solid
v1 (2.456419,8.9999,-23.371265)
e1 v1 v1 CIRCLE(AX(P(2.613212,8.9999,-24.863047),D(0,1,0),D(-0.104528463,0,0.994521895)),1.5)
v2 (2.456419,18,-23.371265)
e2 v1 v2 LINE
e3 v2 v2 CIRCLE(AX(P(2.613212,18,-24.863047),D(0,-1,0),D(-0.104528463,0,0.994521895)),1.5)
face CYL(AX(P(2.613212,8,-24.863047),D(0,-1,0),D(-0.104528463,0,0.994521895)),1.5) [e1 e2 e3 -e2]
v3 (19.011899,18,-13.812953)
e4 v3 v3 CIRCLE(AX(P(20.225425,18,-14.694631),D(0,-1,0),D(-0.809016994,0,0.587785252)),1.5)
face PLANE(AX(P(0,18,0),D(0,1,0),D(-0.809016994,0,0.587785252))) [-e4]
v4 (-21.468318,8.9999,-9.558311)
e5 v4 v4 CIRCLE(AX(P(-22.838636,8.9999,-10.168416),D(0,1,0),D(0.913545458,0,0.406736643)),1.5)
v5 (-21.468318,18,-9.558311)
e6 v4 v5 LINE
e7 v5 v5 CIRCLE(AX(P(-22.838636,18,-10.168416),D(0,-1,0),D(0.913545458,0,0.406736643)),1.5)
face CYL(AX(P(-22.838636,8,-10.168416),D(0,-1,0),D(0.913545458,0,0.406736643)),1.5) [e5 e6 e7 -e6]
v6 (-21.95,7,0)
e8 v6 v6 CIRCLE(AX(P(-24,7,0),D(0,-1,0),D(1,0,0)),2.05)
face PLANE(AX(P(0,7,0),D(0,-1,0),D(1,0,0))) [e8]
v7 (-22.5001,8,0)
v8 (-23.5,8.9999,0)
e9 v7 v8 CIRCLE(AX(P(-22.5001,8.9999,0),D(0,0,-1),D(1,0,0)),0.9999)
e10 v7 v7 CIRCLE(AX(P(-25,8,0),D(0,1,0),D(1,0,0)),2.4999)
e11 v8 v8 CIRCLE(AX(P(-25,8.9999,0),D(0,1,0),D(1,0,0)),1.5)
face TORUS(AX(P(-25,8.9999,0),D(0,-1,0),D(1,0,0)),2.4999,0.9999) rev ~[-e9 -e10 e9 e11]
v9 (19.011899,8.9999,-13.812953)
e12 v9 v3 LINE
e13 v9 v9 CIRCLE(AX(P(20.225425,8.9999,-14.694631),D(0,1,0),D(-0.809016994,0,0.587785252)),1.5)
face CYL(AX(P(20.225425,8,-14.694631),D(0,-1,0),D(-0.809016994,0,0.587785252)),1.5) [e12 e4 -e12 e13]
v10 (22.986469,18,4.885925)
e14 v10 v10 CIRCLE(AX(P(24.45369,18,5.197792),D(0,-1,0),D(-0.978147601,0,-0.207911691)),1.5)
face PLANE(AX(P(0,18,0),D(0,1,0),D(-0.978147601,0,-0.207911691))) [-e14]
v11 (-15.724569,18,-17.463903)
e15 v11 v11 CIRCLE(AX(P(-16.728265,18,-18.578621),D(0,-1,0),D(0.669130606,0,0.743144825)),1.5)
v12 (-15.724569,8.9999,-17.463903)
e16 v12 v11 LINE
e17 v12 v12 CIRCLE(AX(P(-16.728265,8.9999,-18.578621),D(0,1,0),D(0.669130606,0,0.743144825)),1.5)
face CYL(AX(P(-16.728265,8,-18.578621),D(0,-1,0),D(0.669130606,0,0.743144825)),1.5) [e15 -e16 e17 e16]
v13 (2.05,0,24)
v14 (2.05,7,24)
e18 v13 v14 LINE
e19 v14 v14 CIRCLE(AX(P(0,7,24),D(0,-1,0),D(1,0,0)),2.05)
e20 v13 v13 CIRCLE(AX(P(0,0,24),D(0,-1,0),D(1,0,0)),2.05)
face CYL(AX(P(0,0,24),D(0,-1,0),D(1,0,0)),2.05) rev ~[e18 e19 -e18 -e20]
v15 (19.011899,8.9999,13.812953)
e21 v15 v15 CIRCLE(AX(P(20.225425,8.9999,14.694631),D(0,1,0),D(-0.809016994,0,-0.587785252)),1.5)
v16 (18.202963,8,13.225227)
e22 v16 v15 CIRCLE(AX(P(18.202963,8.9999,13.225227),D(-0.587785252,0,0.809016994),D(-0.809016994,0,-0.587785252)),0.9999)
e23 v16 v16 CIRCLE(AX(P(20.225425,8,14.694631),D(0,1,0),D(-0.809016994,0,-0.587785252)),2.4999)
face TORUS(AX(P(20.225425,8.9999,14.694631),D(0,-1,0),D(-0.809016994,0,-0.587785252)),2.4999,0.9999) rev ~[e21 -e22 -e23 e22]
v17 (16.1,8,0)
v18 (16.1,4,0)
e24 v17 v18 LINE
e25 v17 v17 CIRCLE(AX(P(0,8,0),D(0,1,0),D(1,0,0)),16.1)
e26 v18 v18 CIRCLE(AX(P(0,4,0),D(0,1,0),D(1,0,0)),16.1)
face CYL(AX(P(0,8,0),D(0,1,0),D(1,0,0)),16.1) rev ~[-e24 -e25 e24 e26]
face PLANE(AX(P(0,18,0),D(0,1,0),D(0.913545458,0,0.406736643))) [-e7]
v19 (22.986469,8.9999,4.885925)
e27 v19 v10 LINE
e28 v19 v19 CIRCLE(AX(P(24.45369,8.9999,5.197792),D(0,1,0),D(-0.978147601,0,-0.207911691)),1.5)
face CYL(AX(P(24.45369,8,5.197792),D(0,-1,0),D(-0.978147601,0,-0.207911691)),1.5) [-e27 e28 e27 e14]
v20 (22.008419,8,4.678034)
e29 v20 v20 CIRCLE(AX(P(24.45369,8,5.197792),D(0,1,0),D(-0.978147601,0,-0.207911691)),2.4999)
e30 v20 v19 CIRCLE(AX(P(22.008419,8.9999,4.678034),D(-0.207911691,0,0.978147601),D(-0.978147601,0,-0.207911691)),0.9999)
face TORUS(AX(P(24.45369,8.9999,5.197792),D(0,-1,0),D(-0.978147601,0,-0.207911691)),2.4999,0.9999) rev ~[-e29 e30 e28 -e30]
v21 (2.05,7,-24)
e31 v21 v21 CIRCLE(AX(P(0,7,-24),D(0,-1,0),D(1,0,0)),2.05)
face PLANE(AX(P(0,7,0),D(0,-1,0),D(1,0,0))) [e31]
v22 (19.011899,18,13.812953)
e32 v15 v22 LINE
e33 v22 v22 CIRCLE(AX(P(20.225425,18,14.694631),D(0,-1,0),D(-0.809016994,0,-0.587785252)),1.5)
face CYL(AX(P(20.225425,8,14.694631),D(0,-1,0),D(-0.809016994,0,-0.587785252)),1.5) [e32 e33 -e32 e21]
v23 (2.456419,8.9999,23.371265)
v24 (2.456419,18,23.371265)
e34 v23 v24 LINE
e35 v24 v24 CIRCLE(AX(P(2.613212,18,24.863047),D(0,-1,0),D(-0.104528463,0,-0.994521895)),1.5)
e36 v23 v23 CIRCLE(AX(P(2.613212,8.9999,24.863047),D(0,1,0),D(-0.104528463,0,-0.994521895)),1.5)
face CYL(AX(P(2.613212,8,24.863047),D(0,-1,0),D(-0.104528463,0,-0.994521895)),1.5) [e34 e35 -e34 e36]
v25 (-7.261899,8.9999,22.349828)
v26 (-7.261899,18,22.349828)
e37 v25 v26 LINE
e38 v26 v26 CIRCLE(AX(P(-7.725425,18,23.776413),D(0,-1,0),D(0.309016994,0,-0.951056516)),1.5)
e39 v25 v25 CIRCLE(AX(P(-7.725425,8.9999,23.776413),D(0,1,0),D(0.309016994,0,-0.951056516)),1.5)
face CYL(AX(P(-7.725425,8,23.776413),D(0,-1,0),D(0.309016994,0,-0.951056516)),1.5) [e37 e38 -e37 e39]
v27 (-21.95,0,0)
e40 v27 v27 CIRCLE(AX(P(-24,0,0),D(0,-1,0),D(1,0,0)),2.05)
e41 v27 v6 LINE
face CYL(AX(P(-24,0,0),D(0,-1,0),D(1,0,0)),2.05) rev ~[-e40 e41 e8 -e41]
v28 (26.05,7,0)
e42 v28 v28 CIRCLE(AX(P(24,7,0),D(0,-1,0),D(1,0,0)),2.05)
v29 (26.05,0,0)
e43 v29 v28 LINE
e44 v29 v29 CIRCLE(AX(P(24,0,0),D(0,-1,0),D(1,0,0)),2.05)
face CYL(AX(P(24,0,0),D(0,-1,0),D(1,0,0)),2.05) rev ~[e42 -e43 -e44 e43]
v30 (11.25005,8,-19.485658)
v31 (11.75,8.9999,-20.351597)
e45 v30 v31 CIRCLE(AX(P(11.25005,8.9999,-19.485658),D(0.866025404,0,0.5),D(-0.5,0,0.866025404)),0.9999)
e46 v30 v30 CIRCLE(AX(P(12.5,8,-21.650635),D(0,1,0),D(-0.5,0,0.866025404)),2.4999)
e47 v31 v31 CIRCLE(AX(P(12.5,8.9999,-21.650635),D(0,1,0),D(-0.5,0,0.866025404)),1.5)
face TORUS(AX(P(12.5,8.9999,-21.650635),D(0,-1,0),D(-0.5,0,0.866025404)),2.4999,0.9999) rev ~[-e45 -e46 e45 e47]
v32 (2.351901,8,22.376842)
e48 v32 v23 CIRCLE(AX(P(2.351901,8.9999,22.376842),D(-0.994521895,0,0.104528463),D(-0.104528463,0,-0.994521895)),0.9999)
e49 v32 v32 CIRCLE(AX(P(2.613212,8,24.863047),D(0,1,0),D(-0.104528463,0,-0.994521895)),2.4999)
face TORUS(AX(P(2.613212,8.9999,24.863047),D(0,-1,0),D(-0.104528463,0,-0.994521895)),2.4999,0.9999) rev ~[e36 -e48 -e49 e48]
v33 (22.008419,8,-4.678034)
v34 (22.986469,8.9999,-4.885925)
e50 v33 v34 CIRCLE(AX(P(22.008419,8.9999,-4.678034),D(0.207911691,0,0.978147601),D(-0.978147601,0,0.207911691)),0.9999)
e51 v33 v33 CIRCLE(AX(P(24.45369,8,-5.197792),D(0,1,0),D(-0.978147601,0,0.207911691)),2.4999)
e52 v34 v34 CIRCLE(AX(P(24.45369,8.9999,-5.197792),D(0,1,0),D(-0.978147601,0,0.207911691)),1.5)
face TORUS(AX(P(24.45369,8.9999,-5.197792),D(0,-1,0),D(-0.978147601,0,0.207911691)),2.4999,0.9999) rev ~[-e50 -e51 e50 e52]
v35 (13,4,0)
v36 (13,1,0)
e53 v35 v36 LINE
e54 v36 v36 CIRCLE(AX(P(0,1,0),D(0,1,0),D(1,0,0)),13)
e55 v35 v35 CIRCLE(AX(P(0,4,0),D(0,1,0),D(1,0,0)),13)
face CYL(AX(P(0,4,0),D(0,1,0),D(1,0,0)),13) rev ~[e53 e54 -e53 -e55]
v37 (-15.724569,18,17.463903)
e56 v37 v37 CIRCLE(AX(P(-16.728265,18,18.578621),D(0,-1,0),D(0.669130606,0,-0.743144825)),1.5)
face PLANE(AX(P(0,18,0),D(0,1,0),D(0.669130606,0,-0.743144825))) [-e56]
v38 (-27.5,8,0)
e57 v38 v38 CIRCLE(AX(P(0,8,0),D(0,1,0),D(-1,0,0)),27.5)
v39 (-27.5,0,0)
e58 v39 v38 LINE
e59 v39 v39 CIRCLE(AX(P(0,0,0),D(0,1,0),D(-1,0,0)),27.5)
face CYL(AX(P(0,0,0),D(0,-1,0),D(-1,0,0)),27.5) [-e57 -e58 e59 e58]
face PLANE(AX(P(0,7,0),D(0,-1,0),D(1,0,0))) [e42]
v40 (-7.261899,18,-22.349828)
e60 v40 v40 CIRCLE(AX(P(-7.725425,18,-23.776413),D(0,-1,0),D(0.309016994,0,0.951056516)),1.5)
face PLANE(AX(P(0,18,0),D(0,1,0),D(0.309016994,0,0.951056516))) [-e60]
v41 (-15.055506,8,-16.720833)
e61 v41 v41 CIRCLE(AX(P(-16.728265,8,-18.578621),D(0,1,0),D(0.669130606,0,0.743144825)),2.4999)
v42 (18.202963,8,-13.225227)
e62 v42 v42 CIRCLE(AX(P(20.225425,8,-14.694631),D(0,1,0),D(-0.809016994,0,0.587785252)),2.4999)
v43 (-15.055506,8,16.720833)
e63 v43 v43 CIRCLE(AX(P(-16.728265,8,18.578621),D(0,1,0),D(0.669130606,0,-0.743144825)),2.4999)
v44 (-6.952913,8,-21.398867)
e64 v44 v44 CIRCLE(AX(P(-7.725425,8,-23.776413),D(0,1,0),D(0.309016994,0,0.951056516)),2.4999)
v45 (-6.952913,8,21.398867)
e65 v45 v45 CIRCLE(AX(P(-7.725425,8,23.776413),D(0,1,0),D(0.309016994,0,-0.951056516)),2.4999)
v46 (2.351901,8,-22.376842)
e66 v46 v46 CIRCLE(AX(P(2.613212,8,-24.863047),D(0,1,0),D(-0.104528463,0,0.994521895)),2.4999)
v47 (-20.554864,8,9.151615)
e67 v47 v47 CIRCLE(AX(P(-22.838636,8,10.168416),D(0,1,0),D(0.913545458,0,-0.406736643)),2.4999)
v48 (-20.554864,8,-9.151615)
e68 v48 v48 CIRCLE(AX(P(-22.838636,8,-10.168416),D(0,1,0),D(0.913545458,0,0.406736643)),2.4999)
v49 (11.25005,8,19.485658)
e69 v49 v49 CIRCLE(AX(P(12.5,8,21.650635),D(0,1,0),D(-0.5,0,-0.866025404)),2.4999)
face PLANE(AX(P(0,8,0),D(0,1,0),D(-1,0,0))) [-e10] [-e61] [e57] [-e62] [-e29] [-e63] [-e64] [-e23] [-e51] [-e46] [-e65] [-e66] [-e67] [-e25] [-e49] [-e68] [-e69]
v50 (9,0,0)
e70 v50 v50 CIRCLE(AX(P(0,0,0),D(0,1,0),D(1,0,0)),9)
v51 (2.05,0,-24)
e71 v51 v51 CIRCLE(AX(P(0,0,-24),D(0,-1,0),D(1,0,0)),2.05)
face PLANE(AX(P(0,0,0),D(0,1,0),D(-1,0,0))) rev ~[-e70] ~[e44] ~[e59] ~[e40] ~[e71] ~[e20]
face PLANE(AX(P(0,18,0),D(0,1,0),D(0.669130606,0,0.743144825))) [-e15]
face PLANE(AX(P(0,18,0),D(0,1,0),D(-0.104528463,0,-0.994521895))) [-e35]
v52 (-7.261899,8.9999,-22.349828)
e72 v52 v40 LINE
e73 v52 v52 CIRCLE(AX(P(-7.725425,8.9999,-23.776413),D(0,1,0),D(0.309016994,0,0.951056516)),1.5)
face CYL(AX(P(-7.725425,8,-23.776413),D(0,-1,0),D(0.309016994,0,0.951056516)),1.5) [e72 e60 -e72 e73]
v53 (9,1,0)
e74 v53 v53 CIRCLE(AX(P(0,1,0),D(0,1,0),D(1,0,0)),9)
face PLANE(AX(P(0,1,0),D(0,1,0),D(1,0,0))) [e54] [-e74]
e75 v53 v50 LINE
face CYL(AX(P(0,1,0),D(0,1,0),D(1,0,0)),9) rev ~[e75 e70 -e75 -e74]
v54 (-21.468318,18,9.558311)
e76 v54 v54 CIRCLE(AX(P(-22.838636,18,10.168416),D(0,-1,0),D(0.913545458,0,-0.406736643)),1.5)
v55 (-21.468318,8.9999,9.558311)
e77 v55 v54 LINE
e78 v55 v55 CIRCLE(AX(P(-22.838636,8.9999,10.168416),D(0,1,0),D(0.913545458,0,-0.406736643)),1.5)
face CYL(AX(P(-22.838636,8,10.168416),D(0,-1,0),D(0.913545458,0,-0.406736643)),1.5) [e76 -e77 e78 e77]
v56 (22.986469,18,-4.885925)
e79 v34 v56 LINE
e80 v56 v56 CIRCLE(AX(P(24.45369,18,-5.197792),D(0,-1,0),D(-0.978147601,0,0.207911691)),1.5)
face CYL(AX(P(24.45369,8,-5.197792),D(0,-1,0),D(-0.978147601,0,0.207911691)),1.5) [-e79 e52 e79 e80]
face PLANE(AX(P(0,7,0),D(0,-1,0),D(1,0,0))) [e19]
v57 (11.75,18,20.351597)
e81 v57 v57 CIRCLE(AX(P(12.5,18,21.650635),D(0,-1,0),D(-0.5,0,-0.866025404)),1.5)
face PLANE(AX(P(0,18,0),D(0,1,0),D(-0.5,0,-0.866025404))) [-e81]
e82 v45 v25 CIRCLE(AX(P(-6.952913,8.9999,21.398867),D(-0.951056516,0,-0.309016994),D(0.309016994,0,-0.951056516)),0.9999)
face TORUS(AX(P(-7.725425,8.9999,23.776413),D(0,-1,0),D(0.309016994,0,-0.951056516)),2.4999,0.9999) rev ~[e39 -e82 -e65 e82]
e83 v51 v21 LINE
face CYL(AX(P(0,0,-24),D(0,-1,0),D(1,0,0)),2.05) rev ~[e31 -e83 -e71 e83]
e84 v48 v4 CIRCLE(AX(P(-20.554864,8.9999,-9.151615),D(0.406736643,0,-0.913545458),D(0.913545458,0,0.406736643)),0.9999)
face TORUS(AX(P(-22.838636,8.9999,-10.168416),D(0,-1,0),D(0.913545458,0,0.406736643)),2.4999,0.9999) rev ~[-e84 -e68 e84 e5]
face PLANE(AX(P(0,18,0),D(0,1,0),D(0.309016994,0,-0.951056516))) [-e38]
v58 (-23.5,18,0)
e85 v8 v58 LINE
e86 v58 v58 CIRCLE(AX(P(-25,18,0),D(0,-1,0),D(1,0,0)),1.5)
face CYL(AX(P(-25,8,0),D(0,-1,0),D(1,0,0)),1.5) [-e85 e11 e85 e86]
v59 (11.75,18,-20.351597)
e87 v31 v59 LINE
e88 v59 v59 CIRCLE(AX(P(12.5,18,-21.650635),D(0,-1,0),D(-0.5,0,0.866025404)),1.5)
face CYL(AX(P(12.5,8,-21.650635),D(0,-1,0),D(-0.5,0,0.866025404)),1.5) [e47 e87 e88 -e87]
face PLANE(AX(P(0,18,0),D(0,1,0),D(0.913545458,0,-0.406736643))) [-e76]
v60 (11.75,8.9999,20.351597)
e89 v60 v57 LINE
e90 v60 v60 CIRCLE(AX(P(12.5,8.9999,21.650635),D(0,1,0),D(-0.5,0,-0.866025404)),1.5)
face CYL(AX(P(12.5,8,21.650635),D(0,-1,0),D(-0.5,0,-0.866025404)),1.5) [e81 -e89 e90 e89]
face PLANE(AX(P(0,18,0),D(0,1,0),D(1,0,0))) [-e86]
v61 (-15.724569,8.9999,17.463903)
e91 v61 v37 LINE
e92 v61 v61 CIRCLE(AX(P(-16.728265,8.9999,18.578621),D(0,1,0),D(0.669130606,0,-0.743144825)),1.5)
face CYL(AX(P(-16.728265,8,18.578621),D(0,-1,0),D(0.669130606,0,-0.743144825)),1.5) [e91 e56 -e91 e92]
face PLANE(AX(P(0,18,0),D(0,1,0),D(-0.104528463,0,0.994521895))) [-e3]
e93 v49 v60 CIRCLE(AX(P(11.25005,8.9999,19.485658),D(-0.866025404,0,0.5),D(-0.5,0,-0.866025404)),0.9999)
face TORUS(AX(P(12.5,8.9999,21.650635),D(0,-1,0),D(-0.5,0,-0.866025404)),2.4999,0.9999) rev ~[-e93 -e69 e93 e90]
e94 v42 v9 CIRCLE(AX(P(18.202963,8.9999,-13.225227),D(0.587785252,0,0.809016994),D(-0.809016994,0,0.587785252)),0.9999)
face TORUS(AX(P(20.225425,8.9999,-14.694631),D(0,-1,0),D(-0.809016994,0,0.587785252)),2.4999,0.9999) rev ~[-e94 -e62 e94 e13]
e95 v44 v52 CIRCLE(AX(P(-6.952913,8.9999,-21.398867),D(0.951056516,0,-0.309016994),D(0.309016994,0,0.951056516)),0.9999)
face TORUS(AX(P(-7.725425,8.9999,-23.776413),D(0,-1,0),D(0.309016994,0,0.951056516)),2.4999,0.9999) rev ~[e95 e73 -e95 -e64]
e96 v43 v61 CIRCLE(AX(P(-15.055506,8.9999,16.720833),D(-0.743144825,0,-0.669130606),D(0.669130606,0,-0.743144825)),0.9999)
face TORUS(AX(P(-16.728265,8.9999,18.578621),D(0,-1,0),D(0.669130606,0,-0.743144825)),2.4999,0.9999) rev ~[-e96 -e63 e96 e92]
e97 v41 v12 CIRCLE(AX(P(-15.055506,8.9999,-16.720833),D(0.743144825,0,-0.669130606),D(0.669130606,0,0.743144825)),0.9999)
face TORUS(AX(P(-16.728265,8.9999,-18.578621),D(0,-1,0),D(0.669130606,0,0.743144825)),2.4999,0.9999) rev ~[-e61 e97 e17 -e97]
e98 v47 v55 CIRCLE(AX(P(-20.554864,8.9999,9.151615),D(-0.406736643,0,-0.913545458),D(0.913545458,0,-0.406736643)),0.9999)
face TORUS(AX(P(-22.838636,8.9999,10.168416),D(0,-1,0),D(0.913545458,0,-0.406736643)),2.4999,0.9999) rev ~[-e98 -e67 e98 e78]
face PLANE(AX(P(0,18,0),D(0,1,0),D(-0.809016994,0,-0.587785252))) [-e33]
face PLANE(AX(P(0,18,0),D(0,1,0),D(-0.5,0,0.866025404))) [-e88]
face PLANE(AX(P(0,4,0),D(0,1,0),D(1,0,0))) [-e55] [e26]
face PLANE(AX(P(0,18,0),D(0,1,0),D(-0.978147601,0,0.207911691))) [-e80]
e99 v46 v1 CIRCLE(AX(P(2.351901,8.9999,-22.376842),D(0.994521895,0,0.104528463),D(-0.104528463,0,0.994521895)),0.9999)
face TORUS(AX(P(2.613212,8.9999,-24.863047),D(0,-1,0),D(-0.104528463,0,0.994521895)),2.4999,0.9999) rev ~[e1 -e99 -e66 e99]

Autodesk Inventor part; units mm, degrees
ref_plane "YZ Plane" through (0, 0, 0) normal (1, 0, 0) x (0, 1, 0)
ref_plane "XZ Plane" through (0, 0, 0) normal (0, 1, 0) x (-1, 0, 0)
ref_plane "XY Plane" through (0, 0, 0) normal (0, 0, 1) x (1, 0, 0)
sketch "Szkic1" plane through (0, 0, 0) normal (0, 1, 0) x (-1, 0, 0)
  circle A0 centre (0, 0) radius 27.5
  dimension "d0" = 55
extrude "Wyciągnięcie proste1" add sketch "Szkic1" along normal blind 8
sketch "Szkic2" plane through (0, 8, 0) normal (0, 1, 0) x (1, 0, 0)
  circle A0 centre (0, 0) radius 25
  circle A1 centre (-25, 0) radius 1.5
  dimension "d3" = 50
  dimension "d4" = 3
extrude "Wyciągnięcie proste2" add sketch "Szkic2" along normal blind 10 contours A1 A0 | A0 A1 picked at (-24.4967, 0) picked at (-25.4929, -0.0614)
pattern_circular "Szyk kołowy1" count 15 over 360 about axis through (0, 0, 0) along (0, 1, 0) of "Wyciągnięcie proste2"
sketch "Szkic4" plane through (0, 8, 0) normal (0, 1, 0) x (1, 0, 0)
  point P0 (0, 0)
sketch "Szkic5" plane through (0, 8, 0) normal (0, 1, 0) x (1, 0, 0)
  circle A0 centre (0, 0) radius 16.1
  dimension "d13" = 32.2
extrude "Wyciągnięcie proste4" cut sketch "Szkic5" against normal blind 4
sketch "Szkic6" plane through (0, 4, 0) normal (0, 1, 0) x (1, 0, 0)
  circle A0 centre (0, 0) radius 13
  dimension "d16" = 26
extrude "Wyciągnięcie proste5" cut sketch "Szkic6" against normal blind 3
sketch "Szkic9" plane through (0, 0, 0) normal (0, -1, 0) x (1, 0, 0)
  circle A0 centre (24, 0) radius 2.05
  circle A1 centre (0, 24) radius 2.05
  circle A2 centre (-24, 0) radius 2.05
  circle A3 centre (0, -24) radius 2.05
  point P0 (0, 0)
  dimension "d23" = 4.1
  dimension "d26" = 360
  dimension "d30" = 24
extrude "Wyciągnięcie proste7" cut sketch "Szkic9" against normal blind 7
sketch "Szkic10" plane through (0, 1, 0) normal (0, 1, 0) x (1, 0, 0)
  circle A0 centre (0, 0) radius 9
  dimension "d32" = 18
extrude "Wyciągnięcie proste8" cut sketch "Szkic10" against normal blind 4
fillet "Zaokrąglenie1" radius 1 15 edges at (-26.5, 8, 0) (-24.209, 8, -10.7785) (-17.732, 8, -19.6933) (-8.189, 8, -25.203) (2.77, 8, -26.3548) (13.25, 8, -22.9497) (21.439, 8, -15.5763) (25.9209, 8, -5.5097) (25.9209, 8, 5.5097) (21.439, 8, 15.5763) (13.25, 8, 22.9497) (2.77, 8, 26.3548) (-8.189, 8, 25.203) (-17.732, 8, 19.6933) (-24.209, 8, 10.7785)
properties part number "_Drukowanie 3D"
